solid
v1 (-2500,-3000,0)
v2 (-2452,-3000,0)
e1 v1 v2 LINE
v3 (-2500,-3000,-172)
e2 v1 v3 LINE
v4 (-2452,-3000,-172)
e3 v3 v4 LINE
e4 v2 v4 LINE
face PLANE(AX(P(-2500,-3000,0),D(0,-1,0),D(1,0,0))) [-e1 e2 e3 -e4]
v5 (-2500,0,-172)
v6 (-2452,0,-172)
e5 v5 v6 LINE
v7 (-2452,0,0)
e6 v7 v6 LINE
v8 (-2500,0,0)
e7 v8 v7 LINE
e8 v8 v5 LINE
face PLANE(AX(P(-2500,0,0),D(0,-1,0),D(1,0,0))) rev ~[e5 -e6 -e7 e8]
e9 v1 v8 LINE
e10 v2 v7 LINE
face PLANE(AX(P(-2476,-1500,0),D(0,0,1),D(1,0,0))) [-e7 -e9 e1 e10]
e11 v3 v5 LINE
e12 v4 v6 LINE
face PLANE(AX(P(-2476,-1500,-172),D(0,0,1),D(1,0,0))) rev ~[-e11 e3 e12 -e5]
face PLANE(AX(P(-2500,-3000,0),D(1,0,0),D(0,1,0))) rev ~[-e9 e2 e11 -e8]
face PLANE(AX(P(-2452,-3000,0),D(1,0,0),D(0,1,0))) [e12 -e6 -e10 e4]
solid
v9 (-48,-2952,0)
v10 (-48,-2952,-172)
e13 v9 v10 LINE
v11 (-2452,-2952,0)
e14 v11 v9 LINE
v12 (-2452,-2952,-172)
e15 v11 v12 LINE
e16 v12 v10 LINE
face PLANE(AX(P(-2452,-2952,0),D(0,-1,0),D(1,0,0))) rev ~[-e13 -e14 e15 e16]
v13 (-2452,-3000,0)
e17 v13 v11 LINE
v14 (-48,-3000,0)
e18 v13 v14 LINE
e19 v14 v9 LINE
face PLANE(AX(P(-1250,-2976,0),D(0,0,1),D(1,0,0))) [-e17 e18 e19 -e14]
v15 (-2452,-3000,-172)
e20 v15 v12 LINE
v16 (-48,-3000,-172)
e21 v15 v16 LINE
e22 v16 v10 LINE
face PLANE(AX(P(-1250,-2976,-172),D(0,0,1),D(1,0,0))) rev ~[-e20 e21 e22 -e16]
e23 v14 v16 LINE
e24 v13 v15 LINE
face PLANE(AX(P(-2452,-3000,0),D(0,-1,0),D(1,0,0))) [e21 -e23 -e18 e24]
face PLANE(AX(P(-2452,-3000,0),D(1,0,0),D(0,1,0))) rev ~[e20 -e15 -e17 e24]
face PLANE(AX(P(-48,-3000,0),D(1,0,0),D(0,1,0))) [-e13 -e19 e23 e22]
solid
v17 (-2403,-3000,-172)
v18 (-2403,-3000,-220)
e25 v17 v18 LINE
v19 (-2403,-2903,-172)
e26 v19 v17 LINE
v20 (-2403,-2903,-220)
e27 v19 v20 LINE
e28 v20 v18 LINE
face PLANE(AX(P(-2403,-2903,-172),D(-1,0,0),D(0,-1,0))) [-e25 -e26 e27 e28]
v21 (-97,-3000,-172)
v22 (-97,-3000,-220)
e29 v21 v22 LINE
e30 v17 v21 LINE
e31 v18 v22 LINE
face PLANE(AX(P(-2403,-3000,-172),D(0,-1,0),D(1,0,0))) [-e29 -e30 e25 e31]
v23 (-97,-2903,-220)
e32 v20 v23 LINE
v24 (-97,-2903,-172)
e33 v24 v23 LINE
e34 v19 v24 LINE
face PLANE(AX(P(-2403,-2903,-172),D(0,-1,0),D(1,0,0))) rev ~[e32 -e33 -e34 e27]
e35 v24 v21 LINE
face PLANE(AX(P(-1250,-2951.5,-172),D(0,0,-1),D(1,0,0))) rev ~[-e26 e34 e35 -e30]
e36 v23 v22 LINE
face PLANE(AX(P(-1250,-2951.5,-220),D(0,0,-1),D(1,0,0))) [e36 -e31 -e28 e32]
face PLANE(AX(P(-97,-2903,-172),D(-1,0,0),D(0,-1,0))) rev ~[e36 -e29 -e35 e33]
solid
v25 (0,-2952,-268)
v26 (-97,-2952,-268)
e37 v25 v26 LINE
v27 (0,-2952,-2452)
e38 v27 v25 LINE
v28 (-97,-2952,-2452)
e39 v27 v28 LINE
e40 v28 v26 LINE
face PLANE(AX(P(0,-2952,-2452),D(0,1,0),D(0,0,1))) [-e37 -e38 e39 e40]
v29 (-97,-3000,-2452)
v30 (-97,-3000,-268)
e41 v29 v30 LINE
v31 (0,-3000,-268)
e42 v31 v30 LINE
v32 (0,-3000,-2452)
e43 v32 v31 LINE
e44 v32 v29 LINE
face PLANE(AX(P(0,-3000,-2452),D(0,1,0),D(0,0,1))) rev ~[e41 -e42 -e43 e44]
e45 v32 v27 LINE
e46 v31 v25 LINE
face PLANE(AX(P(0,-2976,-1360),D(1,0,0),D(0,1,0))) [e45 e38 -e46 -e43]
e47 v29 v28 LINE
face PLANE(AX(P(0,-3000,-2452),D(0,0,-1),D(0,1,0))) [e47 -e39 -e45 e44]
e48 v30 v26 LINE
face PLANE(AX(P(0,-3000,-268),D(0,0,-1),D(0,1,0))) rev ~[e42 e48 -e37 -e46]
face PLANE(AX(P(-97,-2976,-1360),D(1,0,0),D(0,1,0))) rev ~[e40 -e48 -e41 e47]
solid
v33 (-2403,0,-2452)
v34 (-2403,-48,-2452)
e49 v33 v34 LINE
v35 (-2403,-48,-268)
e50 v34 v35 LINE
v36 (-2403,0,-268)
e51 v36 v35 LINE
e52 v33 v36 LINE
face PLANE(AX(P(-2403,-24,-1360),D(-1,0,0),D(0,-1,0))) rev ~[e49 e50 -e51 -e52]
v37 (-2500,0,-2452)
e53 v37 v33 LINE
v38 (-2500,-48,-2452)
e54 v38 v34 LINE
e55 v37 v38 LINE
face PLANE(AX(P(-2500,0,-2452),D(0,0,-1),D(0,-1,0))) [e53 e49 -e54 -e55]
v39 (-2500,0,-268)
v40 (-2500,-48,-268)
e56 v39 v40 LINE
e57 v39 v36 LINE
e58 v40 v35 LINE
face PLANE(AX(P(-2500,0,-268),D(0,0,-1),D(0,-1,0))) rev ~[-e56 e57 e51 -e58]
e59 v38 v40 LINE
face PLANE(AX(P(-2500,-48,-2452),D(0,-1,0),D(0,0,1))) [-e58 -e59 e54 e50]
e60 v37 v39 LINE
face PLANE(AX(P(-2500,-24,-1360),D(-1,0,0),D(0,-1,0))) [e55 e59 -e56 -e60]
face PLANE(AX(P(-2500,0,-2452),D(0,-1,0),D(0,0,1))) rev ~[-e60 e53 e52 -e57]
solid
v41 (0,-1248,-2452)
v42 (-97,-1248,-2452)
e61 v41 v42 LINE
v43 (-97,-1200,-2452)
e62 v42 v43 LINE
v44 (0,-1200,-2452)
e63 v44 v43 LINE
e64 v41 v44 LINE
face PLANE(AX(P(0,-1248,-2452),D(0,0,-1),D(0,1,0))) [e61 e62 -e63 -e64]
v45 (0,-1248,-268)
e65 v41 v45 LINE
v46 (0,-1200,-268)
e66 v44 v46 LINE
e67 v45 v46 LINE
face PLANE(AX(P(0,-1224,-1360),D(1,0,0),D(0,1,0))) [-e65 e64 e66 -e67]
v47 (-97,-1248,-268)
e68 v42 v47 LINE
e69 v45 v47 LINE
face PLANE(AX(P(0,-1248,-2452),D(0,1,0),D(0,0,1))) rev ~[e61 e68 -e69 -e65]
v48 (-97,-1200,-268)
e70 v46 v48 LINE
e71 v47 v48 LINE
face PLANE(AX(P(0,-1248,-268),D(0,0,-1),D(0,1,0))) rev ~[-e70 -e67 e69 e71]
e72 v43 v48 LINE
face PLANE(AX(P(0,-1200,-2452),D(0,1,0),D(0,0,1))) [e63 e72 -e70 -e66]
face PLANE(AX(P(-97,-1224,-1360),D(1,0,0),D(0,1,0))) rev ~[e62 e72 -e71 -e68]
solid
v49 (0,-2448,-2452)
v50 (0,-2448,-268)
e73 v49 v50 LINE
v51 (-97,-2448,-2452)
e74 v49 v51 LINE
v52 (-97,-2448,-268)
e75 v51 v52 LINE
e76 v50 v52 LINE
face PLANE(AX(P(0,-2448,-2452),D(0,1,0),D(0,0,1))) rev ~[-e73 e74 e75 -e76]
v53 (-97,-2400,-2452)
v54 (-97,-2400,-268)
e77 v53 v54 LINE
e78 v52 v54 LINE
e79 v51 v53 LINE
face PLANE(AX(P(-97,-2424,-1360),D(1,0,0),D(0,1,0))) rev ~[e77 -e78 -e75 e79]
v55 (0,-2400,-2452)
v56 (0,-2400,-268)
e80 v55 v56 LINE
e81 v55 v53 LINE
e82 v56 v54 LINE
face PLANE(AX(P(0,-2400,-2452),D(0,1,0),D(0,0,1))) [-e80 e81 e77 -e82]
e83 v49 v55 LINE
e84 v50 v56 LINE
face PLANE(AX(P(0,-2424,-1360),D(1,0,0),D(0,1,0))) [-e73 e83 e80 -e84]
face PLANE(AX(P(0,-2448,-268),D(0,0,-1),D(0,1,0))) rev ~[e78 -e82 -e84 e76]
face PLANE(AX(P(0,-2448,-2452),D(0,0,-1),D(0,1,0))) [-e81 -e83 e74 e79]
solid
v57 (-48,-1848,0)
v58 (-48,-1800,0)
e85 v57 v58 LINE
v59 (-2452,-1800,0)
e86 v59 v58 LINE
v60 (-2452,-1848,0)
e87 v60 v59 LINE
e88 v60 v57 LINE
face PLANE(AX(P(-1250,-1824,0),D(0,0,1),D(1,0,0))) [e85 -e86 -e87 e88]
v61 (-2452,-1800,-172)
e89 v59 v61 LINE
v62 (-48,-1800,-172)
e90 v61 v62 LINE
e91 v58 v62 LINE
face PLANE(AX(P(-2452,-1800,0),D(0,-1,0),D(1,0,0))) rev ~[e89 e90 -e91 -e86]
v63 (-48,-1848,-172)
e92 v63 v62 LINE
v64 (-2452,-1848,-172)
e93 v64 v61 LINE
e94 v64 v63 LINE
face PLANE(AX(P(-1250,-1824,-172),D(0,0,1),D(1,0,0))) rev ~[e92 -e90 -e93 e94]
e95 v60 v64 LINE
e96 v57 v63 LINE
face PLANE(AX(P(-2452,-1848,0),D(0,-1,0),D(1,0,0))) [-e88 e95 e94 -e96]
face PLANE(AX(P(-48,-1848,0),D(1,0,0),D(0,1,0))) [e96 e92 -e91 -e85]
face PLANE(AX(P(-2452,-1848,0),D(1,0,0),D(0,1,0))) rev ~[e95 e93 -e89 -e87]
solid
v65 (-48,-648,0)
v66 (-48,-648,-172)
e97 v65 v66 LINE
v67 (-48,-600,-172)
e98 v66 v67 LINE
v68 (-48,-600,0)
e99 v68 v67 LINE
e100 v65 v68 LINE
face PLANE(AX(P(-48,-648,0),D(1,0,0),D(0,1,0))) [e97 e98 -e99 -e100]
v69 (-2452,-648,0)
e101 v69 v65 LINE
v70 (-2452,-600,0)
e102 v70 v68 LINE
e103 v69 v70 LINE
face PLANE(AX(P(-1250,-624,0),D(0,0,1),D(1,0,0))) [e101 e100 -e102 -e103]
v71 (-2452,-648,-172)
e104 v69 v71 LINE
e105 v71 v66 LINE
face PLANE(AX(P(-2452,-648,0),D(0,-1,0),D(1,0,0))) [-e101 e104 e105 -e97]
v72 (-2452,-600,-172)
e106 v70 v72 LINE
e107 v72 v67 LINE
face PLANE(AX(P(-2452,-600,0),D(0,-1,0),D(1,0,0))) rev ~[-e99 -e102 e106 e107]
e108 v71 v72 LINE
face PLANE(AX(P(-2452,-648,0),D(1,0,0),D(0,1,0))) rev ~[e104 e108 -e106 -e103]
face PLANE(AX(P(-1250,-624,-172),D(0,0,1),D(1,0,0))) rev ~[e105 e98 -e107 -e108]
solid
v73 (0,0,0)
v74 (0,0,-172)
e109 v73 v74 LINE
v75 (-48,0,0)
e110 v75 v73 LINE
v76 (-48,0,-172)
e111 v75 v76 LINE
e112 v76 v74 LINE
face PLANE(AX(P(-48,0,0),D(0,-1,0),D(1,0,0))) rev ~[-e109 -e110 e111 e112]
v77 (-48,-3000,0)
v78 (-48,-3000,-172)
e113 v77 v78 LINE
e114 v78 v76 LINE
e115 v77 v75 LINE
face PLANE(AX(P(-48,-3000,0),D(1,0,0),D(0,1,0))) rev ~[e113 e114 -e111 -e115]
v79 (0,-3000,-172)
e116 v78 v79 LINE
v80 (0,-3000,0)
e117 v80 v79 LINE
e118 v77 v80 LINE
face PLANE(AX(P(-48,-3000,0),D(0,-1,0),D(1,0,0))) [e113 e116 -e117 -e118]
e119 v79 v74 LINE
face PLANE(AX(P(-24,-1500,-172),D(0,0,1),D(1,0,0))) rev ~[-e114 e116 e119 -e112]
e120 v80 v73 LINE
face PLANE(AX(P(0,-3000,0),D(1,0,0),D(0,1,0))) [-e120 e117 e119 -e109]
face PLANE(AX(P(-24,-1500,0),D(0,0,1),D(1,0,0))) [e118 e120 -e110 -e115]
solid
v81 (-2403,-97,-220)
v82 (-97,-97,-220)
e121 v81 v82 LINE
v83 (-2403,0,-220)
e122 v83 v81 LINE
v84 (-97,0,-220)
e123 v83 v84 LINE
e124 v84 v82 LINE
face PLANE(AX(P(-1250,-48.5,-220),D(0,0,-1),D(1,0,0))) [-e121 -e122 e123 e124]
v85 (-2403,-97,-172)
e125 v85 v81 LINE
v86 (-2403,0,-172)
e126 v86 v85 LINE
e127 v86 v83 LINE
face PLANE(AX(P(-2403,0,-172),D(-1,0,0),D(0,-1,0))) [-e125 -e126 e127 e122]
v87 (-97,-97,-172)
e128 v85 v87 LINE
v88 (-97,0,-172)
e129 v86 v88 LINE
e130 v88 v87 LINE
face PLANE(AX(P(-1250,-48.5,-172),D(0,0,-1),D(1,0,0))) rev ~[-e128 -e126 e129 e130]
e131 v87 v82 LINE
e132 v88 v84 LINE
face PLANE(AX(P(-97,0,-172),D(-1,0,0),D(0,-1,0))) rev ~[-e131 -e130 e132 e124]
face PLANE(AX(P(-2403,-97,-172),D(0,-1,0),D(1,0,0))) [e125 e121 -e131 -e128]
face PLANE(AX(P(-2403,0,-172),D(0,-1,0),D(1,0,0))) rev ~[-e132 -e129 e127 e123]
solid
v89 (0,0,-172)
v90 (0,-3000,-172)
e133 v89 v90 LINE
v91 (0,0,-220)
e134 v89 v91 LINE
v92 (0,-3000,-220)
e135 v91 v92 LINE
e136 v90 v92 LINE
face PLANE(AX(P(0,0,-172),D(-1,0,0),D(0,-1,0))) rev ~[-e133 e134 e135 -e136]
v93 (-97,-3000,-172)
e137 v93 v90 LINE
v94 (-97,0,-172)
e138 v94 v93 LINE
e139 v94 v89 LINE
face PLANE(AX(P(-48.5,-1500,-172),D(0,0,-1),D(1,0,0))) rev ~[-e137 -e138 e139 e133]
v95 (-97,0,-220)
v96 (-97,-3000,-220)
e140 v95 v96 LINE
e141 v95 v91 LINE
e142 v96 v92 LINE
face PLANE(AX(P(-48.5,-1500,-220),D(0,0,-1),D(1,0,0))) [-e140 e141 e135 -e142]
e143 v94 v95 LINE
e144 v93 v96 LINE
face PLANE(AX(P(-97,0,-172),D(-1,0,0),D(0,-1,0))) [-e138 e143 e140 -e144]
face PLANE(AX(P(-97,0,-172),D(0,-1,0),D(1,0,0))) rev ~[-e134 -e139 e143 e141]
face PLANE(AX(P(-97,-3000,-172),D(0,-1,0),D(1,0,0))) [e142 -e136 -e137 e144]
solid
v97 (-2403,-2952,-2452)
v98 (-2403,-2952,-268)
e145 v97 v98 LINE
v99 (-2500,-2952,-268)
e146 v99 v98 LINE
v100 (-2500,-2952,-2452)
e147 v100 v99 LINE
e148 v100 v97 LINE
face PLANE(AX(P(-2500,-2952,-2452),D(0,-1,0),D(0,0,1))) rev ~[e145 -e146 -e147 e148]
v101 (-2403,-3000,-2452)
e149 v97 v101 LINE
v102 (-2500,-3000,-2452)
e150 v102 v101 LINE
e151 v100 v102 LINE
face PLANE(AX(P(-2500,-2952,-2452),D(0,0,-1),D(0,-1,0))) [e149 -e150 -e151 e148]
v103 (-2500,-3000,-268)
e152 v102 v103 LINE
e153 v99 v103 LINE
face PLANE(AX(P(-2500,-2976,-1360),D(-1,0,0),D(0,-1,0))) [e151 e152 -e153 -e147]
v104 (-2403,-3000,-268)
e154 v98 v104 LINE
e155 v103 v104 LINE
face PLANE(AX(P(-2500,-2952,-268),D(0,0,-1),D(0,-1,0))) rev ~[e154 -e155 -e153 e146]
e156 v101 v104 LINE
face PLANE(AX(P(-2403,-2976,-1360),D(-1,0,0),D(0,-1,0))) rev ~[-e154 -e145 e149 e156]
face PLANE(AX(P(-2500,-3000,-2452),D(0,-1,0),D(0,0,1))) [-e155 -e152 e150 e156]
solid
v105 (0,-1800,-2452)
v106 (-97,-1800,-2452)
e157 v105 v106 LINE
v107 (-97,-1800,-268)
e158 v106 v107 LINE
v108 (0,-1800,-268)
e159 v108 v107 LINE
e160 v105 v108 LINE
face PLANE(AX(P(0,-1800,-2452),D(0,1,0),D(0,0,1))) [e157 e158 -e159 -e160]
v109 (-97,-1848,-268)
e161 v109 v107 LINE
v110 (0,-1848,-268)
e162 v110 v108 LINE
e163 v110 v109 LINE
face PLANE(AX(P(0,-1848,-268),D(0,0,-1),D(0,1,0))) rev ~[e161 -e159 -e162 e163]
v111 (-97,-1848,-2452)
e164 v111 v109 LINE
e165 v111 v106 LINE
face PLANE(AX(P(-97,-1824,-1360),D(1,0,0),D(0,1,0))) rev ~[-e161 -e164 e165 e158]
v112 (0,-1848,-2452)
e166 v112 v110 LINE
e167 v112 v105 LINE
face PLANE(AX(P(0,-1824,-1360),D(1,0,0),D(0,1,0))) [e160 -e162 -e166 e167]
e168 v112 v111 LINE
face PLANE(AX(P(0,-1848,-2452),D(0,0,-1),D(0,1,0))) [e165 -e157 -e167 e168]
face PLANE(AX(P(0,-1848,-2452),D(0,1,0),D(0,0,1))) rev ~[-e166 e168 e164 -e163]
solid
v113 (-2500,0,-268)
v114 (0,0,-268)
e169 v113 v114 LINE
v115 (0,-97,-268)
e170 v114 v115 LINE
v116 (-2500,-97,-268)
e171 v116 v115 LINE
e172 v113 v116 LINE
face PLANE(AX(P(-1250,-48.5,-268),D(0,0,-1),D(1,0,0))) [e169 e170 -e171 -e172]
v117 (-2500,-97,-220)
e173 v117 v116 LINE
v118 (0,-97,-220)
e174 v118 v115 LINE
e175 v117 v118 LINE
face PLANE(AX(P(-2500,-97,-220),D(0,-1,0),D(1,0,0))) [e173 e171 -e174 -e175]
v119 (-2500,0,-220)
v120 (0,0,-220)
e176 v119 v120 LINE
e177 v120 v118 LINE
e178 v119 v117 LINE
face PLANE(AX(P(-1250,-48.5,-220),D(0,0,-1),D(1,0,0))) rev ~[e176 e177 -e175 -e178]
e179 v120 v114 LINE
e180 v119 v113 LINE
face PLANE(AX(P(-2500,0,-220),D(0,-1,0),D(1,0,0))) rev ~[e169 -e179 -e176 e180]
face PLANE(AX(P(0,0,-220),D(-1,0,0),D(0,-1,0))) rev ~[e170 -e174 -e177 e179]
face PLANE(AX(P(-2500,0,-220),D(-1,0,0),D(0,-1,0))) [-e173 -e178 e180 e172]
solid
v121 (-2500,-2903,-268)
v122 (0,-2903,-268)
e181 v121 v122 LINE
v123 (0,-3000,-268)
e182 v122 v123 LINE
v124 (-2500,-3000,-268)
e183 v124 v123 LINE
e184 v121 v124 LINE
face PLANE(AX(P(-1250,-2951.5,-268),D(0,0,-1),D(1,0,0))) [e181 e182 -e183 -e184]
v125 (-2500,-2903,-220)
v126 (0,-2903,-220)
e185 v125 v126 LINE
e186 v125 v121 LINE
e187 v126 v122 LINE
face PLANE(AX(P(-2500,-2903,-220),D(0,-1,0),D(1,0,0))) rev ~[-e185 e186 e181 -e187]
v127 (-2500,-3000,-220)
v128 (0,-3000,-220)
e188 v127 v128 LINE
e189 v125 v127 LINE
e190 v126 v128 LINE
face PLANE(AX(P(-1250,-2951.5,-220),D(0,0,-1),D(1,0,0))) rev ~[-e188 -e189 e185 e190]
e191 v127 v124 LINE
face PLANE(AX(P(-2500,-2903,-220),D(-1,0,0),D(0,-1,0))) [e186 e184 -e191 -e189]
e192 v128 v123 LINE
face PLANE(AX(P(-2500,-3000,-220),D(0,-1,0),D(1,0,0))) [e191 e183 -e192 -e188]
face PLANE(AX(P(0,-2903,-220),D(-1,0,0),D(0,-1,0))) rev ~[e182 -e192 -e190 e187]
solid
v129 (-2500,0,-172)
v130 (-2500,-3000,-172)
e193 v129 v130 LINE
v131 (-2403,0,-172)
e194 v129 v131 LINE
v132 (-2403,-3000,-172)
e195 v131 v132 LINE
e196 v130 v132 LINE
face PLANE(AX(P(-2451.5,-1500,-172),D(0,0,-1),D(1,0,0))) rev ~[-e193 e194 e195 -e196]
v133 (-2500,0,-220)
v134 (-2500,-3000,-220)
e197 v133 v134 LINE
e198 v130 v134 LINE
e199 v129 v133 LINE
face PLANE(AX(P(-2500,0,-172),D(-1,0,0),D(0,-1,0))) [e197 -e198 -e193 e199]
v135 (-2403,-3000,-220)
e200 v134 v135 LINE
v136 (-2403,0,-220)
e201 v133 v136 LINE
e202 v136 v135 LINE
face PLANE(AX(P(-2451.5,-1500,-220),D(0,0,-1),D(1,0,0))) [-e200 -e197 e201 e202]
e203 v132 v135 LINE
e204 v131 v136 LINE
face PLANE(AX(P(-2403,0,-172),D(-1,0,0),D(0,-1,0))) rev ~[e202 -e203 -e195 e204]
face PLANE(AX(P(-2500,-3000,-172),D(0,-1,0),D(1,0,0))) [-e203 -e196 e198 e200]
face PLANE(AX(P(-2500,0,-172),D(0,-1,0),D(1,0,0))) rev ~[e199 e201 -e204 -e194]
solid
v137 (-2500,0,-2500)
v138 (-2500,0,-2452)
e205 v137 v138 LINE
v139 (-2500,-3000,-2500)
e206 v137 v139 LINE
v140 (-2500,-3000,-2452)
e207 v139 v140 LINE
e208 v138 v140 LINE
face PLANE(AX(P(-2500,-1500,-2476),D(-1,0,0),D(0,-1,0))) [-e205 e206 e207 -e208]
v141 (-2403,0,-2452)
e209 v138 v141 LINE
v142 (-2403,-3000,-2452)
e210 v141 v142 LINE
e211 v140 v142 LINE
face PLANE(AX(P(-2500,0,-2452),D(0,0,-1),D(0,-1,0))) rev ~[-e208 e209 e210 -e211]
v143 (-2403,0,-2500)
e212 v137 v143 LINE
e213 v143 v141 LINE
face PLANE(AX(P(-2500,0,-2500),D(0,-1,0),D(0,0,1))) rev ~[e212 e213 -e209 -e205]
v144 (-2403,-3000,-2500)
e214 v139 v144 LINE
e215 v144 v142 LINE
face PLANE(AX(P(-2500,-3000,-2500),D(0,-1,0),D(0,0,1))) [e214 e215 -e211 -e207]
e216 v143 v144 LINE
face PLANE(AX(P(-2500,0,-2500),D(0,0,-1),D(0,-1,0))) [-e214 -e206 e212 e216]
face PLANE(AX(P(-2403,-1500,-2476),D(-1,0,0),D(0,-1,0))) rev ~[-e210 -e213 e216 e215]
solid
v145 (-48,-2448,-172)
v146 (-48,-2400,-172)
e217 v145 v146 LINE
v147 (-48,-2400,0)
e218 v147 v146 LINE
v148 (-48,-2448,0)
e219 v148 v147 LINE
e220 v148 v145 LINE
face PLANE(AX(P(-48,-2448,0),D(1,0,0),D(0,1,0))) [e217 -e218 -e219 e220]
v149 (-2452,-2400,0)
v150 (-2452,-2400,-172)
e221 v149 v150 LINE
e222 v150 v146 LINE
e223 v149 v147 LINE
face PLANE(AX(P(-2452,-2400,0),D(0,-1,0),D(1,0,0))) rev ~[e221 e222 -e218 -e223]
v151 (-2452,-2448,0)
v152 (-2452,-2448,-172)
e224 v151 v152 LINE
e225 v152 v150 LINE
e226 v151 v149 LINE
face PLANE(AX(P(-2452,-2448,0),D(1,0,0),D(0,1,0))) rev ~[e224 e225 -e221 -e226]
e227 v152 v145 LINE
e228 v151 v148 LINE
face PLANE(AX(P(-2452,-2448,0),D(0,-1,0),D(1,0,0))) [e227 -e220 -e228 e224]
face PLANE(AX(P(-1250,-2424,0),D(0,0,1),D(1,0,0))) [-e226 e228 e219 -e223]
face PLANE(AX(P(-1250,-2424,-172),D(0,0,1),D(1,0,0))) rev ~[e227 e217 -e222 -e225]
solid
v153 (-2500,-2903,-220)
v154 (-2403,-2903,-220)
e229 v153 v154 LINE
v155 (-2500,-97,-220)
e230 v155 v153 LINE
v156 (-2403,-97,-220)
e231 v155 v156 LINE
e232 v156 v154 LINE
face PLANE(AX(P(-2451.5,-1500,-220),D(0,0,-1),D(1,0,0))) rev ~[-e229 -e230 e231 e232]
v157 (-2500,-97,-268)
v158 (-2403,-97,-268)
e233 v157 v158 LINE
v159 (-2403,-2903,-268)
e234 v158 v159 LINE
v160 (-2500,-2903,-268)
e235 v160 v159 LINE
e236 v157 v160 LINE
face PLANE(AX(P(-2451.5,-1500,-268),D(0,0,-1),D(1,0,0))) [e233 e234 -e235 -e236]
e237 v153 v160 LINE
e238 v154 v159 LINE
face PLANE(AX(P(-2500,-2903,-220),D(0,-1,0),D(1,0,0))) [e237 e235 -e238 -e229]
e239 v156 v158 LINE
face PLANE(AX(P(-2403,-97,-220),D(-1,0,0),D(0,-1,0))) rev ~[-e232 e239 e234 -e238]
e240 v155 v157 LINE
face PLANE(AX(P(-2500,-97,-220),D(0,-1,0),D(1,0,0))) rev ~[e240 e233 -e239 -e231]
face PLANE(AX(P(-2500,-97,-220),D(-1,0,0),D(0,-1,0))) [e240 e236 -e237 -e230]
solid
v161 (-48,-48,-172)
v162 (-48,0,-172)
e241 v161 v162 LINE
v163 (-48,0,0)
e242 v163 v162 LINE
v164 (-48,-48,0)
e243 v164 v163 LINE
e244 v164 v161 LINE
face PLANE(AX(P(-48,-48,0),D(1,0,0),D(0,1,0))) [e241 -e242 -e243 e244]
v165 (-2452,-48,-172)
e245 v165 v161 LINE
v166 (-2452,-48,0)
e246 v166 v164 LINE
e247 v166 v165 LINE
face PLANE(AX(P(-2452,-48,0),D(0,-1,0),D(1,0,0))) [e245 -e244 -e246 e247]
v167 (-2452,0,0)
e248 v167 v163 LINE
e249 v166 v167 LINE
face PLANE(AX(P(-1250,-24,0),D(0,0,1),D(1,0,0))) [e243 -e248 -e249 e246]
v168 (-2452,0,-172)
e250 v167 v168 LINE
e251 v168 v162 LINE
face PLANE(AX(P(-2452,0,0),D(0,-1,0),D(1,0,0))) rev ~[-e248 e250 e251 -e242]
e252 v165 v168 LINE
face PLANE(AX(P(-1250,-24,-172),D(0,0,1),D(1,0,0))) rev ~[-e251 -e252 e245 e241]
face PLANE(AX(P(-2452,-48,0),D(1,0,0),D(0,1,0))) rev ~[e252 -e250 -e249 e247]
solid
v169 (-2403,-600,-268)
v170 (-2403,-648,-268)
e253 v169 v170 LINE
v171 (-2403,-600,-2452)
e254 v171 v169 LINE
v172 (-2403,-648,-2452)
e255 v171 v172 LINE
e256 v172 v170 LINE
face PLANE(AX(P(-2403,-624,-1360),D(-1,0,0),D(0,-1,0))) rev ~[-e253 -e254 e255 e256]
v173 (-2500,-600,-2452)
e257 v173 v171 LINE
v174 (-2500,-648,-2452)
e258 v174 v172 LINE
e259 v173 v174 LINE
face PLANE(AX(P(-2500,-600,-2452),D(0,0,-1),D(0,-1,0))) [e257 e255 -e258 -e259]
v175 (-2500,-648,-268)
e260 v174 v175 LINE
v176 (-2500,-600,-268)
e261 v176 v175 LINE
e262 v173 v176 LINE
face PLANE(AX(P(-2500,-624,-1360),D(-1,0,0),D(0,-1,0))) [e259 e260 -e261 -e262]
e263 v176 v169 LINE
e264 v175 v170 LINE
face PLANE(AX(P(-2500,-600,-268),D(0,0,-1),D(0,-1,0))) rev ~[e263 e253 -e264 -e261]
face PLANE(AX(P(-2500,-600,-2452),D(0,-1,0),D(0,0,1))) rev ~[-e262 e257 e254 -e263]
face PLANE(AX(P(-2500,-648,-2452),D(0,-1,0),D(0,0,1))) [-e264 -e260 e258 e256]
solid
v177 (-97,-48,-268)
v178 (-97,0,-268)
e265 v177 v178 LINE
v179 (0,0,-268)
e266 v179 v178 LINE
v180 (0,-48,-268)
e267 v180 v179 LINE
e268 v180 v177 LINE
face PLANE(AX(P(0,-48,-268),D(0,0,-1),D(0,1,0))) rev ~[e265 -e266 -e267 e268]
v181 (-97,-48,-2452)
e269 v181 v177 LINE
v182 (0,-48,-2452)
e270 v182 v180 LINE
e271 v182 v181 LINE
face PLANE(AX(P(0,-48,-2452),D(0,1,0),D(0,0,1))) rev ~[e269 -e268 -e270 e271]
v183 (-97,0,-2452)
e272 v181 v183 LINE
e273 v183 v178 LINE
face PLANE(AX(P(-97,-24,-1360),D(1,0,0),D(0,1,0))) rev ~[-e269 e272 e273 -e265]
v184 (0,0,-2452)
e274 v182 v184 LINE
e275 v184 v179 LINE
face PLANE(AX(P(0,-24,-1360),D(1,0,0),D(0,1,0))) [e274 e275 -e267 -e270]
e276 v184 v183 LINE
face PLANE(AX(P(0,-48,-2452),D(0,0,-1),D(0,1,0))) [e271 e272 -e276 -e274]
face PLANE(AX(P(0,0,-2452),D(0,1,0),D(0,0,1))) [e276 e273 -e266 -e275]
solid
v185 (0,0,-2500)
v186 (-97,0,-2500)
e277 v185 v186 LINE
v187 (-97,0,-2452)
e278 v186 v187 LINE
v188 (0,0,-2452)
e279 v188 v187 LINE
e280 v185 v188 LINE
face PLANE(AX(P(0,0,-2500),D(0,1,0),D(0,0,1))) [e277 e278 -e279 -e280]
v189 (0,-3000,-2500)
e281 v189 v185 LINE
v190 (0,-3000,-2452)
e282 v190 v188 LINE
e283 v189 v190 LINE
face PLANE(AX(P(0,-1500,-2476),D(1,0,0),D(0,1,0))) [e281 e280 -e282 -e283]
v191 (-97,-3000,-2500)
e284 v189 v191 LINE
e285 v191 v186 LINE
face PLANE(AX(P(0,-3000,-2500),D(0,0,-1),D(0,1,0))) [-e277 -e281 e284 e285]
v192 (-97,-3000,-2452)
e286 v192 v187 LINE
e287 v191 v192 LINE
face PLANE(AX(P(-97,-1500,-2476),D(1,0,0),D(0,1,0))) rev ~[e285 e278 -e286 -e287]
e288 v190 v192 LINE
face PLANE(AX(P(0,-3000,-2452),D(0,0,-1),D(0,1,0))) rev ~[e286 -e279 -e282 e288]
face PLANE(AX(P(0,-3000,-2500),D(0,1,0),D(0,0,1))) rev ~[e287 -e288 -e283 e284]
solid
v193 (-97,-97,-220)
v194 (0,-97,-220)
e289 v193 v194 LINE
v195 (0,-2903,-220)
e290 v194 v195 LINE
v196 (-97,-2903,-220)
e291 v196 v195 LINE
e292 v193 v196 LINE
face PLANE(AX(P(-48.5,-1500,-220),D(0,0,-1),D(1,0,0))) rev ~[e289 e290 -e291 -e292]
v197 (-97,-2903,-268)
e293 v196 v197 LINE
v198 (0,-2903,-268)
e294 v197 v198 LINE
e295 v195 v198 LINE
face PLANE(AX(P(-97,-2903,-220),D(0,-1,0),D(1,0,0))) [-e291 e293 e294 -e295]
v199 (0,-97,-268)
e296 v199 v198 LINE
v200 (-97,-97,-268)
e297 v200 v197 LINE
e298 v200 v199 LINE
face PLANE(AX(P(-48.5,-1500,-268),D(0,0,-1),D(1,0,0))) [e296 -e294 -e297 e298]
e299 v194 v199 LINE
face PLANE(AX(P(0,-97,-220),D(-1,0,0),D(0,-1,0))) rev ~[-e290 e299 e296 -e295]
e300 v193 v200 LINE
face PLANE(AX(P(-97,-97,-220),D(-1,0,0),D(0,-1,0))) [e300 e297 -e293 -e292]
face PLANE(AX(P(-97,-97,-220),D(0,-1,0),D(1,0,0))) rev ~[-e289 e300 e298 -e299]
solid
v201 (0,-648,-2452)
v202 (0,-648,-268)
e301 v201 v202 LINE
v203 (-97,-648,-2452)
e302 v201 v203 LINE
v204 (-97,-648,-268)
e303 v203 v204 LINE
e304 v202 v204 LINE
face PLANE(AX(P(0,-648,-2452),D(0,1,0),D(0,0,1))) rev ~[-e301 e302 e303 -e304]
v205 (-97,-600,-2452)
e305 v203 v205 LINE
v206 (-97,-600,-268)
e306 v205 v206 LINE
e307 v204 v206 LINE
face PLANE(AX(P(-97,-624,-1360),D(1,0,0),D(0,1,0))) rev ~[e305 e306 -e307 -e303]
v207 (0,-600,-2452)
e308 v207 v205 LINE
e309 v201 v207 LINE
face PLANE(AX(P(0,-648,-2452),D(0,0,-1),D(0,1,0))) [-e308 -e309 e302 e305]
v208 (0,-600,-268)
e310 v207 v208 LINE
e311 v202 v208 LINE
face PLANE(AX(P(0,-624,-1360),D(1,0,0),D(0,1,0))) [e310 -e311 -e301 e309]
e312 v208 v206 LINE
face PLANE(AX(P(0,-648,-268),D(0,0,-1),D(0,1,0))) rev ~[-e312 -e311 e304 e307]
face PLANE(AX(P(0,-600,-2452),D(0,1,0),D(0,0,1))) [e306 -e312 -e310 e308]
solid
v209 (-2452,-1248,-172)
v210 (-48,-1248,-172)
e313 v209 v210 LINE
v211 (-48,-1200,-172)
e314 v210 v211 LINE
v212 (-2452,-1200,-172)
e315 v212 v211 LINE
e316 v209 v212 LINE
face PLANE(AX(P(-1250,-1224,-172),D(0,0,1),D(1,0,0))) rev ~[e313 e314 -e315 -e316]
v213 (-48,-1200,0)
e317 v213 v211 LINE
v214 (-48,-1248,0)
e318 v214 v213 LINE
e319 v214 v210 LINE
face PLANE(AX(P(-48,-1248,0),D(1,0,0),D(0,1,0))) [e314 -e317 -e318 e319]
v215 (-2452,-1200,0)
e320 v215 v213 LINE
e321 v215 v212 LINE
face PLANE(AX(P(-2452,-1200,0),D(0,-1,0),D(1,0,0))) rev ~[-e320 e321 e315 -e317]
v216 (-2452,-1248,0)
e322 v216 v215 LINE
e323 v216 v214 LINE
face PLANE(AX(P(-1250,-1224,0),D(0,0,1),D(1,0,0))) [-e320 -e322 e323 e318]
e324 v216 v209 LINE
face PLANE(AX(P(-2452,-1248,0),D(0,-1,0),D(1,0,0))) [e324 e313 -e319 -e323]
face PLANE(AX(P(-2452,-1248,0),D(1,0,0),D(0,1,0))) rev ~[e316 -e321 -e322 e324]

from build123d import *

# Parameters (mm, degrees)
F3_W      = 48
F3_H      = 3000
F4_DEPTH  = 172
F5_W      = 2404
F5_H      = 48
F6_DEPTH  = 172
F7_W      = 97
F7_H      = 3000
F8_DEPTH  = 48
F9_W      = 2306
F9_H      = 97
F10_DEPTH = 48
F11_W     = 2500
F11_H     = 97
F12_DEPTH = 48
F13_W     = 97
F13_H     = 2806
F14_DEPTH = 48
F15_W     = 3000
F15_H     = 48
F16_DEPTH = 97
F17_W     = 48
F17_H     = 2184
F18_DEPTH = 97
F19_W     = 3000
F19_H     = 48
F20_DEPTH = 97
F21_W     = 48
F21_H     = 2184
F22_DEPTH = 97
F23_W     = 48
F23_H     = 2184
F24_DEPTH = 97


with BuildPart() as f4:
    # F3 (on Top) → F4 (new body)
    with BuildSketch(Plane.XY):
        with Locations((-24, -1500)):
            Rectangle(F3_W, F3_H)
    extrude(amount=-F4_DEPTH)


with BuildPart() as f4b:
    # F3 (on Top) → F4, piece 2 (new body)
    with BuildSketch(Plane.XY):
        with Locations((-2476, -1500)):
            Rectangle(F3_W, F3_H)
    extrude(amount=-F4_DEPTH)


with BuildPart() as f6:
    # F5 (on face) → F6 (new body)
    with BuildSketch(Plane.XY):
        with Locations((-1250, -24)):
            Rectangle(F5_W, F5_H)
    extrude(amount=-F6_DEPTH)


with BuildPart() as f6b:
    # F5 (on face) → F6, piece 2 (new body)
    with BuildSketch(Plane.XY):
        with Locations((-1250, -624)):
            Rectangle(F5_W, F5_H)
    extrude(amount=-F6_DEPTH)


with BuildPart() as f6c:
    # F5 (on face) → F6, piece 3 (new body)
    with BuildSketch(Plane.XY):
        with Locations((-1250, -1224)):
            Rectangle(F5_W, F5_H)
    extrude(amount=-F6_DEPTH)


with BuildPart() as f6d:
    # F5 (on face) → F6, piece 4 (new body)
    with BuildSketch(Plane.XY):
        with Locations((-1250, -1824)):
            Rectangle(F5_W, F5_H)
    extrude(amount=-F6_DEPTH)


with BuildPart() as f6e:
    # F5 (on face) → F6, piece 5 (new body)
    with BuildSketch(Plane.XY):
        with Locations((-1250, -2424)):
            Rectangle(F5_W, F5_H)
    extrude(amount=-F6_DEPTH)


with BuildPart() as f6f:
    # F5 (on face) → F6, piece 6 (new body)
    with BuildSketch(Plane.XY):
        with Locations((-1250, -2976)):
            Rectangle(F5_W, F5_H)
    extrude(amount=-F6_DEPTH)


with BuildPart() as f8:
    # F7 (on face) → F8 (new body)
    with BuildSketch(Plane(origin=(0, 0, -172), x_dir=(1, 0, 0), z_dir=(0, 0, -1))):
        with Locations((-48.5, 1500)):
            Rectangle(F7_W, F7_H)
    extrude(amount=F8_DEPTH)


with BuildPart() as f8b:
    # F7 (on face) → F8, piece 2 (new body)
    with BuildSketch(Plane(origin=(0, 0, -172), x_dir=(1, 0, 0), z_dir=(0, 0, -1))):
        with Locations((-2451.5, 1500)):
            Rectangle(F7_W, F7_H)
    extrude(amount=F8_DEPTH)


with BuildPart() as f10:
    # F9 (on face) → F10 (new body)
    with BuildSketch(Plane(origin=(0, 0, -172), x_dir=(1, 0, 0), z_dir=(0, 0, -1))):
        with Locations((-1250, 48.5)):
            Rectangle(F9_W, F9_H)
    extrude(amount=F10_DEPTH)


with BuildPart() as f10b:
    # F9 (on face) → F10, piece 2 (new body)
    with BuildSketch(Plane(origin=(0, 0, -172), x_dir=(1, 0, 0), z_dir=(0, 0, -1))):
        with Locations((-1250, 2951.5)):
            Rectangle(F9_W, F9_H)
    extrude(amount=F10_DEPTH)


with BuildPart() as f12:
    # F11 (on face) → F12 (new body)
    with BuildSketch(Plane(origin=(0, 0, -220), x_dir=(1, 0, 0), z_dir=(0, 0, -1))):
        with Locations((-1250, 48.5)):
            Rectangle(F11_W, F11_H)
    extrude(amount=F12_DEPTH)


with BuildPart() as f12b:
    # F11 (on face) → F12, piece 2 (new body)
    with BuildSketch(Plane(origin=(0, 0, -220), x_dir=(1, 0, 0), z_dir=(0, 0, -1))):
        with Locations((-1250, 2951.5)):
            Rectangle(F11_W, F11_H)
    extrude(amount=F12_DEPTH)


with BuildPart() as f14:
    # F13 (on face) → F14 (new body)
    with BuildSketch(Plane(origin=(0, 0, -220), x_dir=(1, 0, 0), z_dir=(0, 0, -1))):
        with Locations((-48.5, 1500)):
            Rectangle(F13_W, F13_H)
    extrude(amount=F14_DEPTH)


with BuildPart() as f14b:
    # F13 (on face) → F14, piece 2 (new body)
    with BuildSketch(Plane(origin=(0, 0, -220), x_dir=(1, 0, 0), z_dir=(0, 0, -1))):
        with Locations((-2451.5, 1500)):
            Rectangle(F13_W, F13_H)
    extrude(amount=F14_DEPTH)


with BuildPart() as f16:
    # F15 (on Right) → F16 (new body)
    with BuildSketch(Plane.YZ):
        with Locations((-1500, -2476)):
            Rectangle(F15_W, F15_H)
    extrude(amount=-F16_DEPTH)


with BuildPart() as f18:
    # F17 (on Right) → F18 (new body)
    with BuildSketch(Plane.YZ):
        with Locations((-24, -1360)):
            Rectangle(F17_W, F17_H)
    extrude(amount=-F18_DEPTH)


with BuildPart() as f18b:
    # F17 (on Right) → F18, piece 2 (new body)
    with BuildSketch(Plane.YZ):
        with Locations((-624, -1360)):
            Rectangle(F17_W, F17_H)
    extrude(amount=-F18_DEPTH)


with BuildPart() as f18c:
    # F17 (on Right) → F18, piece 3 (new body)
    with BuildSketch(Plane.YZ):
        with Locations((-1224, -1360)):
            Rectangle(F17_W, F17_H)
    extrude(amount=-F18_DEPTH)


with BuildPart() as f18d:
    # F17 (on Right) → F18, piece 4 (new body)
    with BuildSketch(Plane.YZ):
        with Locations((-1824, -1360)):
            Rectangle(F17_W, F17_H)
    extrude(amount=-F18_DEPTH)


with BuildPart() as f18e:
    # F17 (on Right) → F18, piece 5 (new body)
    with BuildSketch(Plane.YZ):
        with Locations((-2424, -1360)):
            Rectangle(F17_W, F17_H)
    extrude(amount=-F18_DEPTH)


with BuildPart() as f18f:
    # F17 (on Right) → F18, piece 6 (new body)
    with BuildSketch(Plane.YZ):
        with Locations((-2976, -1360)):
            Rectangle(F17_W, F17_H)
    extrude(amount=-F18_DEPTH)


with BuildPart() as f20:
    # F19 (on face) → F20 (new body)
    with BuildSketch(Plane(origin=(-2500, 0, 0), x_dir=(0, -1, 0), z_dir=(-1, 0, 0))):
        with Locations((1500, -2476)):
            Rectangle(F19_W, F19_H)
    extrude(amount=-F20_DEPTH)


with BuildPart() as f22:
    # F21 (on face) → F22 (new body)
    with BuildSketch(Plane(origin=(-2500, 0, 0), x_dir=(0, -1, 0), z_dir=(-1, 0, 0))):
        with Locations((24, -1360)):
            Rectangle(F21_W, F21_H)
    extrude(amount=-F22_DEPTH)


with BuildPart() as f22b:
    # F21 (on face) → F22, piece 2 (new body)
    with BuildSketch(Plane(origin=(-2500, 0, 0), x_dir=(0, -1, 0), z_dir=(-1, 0, 0))):
        with Locations((624, -1360)):
            Rectangle(F21_W, F21_H)
    extrude(amount=-F22_DEPTH)


with BuildPart() as f24:
    # F23 (on face) → F24 (new body)
    with BuildSketch(Plane(origin=(-2500, 0, 0), x_dir=(0, -1, 0), z_dir=(-1, 0, 0))):
        with Locations((2976, -1360)):
            Rectangle(F23_W, F23_H)
    extrude(amount=-F24_DEPTH)


solid = Compound([f4.part, f4b.part, f6.part, f6b.part, f6c.part, f6d.part, f6e.part, f6f.part, f8.part, f8b.part, f10.part, f10b.part, f12.part, f12b.part, f14.part, f14b.part, f16.part, f18.part, f18b.part, f18c.part, f18d.part, f18e.part, f18f.part, f20.part, f22.part, f22b.part, f24.part])
